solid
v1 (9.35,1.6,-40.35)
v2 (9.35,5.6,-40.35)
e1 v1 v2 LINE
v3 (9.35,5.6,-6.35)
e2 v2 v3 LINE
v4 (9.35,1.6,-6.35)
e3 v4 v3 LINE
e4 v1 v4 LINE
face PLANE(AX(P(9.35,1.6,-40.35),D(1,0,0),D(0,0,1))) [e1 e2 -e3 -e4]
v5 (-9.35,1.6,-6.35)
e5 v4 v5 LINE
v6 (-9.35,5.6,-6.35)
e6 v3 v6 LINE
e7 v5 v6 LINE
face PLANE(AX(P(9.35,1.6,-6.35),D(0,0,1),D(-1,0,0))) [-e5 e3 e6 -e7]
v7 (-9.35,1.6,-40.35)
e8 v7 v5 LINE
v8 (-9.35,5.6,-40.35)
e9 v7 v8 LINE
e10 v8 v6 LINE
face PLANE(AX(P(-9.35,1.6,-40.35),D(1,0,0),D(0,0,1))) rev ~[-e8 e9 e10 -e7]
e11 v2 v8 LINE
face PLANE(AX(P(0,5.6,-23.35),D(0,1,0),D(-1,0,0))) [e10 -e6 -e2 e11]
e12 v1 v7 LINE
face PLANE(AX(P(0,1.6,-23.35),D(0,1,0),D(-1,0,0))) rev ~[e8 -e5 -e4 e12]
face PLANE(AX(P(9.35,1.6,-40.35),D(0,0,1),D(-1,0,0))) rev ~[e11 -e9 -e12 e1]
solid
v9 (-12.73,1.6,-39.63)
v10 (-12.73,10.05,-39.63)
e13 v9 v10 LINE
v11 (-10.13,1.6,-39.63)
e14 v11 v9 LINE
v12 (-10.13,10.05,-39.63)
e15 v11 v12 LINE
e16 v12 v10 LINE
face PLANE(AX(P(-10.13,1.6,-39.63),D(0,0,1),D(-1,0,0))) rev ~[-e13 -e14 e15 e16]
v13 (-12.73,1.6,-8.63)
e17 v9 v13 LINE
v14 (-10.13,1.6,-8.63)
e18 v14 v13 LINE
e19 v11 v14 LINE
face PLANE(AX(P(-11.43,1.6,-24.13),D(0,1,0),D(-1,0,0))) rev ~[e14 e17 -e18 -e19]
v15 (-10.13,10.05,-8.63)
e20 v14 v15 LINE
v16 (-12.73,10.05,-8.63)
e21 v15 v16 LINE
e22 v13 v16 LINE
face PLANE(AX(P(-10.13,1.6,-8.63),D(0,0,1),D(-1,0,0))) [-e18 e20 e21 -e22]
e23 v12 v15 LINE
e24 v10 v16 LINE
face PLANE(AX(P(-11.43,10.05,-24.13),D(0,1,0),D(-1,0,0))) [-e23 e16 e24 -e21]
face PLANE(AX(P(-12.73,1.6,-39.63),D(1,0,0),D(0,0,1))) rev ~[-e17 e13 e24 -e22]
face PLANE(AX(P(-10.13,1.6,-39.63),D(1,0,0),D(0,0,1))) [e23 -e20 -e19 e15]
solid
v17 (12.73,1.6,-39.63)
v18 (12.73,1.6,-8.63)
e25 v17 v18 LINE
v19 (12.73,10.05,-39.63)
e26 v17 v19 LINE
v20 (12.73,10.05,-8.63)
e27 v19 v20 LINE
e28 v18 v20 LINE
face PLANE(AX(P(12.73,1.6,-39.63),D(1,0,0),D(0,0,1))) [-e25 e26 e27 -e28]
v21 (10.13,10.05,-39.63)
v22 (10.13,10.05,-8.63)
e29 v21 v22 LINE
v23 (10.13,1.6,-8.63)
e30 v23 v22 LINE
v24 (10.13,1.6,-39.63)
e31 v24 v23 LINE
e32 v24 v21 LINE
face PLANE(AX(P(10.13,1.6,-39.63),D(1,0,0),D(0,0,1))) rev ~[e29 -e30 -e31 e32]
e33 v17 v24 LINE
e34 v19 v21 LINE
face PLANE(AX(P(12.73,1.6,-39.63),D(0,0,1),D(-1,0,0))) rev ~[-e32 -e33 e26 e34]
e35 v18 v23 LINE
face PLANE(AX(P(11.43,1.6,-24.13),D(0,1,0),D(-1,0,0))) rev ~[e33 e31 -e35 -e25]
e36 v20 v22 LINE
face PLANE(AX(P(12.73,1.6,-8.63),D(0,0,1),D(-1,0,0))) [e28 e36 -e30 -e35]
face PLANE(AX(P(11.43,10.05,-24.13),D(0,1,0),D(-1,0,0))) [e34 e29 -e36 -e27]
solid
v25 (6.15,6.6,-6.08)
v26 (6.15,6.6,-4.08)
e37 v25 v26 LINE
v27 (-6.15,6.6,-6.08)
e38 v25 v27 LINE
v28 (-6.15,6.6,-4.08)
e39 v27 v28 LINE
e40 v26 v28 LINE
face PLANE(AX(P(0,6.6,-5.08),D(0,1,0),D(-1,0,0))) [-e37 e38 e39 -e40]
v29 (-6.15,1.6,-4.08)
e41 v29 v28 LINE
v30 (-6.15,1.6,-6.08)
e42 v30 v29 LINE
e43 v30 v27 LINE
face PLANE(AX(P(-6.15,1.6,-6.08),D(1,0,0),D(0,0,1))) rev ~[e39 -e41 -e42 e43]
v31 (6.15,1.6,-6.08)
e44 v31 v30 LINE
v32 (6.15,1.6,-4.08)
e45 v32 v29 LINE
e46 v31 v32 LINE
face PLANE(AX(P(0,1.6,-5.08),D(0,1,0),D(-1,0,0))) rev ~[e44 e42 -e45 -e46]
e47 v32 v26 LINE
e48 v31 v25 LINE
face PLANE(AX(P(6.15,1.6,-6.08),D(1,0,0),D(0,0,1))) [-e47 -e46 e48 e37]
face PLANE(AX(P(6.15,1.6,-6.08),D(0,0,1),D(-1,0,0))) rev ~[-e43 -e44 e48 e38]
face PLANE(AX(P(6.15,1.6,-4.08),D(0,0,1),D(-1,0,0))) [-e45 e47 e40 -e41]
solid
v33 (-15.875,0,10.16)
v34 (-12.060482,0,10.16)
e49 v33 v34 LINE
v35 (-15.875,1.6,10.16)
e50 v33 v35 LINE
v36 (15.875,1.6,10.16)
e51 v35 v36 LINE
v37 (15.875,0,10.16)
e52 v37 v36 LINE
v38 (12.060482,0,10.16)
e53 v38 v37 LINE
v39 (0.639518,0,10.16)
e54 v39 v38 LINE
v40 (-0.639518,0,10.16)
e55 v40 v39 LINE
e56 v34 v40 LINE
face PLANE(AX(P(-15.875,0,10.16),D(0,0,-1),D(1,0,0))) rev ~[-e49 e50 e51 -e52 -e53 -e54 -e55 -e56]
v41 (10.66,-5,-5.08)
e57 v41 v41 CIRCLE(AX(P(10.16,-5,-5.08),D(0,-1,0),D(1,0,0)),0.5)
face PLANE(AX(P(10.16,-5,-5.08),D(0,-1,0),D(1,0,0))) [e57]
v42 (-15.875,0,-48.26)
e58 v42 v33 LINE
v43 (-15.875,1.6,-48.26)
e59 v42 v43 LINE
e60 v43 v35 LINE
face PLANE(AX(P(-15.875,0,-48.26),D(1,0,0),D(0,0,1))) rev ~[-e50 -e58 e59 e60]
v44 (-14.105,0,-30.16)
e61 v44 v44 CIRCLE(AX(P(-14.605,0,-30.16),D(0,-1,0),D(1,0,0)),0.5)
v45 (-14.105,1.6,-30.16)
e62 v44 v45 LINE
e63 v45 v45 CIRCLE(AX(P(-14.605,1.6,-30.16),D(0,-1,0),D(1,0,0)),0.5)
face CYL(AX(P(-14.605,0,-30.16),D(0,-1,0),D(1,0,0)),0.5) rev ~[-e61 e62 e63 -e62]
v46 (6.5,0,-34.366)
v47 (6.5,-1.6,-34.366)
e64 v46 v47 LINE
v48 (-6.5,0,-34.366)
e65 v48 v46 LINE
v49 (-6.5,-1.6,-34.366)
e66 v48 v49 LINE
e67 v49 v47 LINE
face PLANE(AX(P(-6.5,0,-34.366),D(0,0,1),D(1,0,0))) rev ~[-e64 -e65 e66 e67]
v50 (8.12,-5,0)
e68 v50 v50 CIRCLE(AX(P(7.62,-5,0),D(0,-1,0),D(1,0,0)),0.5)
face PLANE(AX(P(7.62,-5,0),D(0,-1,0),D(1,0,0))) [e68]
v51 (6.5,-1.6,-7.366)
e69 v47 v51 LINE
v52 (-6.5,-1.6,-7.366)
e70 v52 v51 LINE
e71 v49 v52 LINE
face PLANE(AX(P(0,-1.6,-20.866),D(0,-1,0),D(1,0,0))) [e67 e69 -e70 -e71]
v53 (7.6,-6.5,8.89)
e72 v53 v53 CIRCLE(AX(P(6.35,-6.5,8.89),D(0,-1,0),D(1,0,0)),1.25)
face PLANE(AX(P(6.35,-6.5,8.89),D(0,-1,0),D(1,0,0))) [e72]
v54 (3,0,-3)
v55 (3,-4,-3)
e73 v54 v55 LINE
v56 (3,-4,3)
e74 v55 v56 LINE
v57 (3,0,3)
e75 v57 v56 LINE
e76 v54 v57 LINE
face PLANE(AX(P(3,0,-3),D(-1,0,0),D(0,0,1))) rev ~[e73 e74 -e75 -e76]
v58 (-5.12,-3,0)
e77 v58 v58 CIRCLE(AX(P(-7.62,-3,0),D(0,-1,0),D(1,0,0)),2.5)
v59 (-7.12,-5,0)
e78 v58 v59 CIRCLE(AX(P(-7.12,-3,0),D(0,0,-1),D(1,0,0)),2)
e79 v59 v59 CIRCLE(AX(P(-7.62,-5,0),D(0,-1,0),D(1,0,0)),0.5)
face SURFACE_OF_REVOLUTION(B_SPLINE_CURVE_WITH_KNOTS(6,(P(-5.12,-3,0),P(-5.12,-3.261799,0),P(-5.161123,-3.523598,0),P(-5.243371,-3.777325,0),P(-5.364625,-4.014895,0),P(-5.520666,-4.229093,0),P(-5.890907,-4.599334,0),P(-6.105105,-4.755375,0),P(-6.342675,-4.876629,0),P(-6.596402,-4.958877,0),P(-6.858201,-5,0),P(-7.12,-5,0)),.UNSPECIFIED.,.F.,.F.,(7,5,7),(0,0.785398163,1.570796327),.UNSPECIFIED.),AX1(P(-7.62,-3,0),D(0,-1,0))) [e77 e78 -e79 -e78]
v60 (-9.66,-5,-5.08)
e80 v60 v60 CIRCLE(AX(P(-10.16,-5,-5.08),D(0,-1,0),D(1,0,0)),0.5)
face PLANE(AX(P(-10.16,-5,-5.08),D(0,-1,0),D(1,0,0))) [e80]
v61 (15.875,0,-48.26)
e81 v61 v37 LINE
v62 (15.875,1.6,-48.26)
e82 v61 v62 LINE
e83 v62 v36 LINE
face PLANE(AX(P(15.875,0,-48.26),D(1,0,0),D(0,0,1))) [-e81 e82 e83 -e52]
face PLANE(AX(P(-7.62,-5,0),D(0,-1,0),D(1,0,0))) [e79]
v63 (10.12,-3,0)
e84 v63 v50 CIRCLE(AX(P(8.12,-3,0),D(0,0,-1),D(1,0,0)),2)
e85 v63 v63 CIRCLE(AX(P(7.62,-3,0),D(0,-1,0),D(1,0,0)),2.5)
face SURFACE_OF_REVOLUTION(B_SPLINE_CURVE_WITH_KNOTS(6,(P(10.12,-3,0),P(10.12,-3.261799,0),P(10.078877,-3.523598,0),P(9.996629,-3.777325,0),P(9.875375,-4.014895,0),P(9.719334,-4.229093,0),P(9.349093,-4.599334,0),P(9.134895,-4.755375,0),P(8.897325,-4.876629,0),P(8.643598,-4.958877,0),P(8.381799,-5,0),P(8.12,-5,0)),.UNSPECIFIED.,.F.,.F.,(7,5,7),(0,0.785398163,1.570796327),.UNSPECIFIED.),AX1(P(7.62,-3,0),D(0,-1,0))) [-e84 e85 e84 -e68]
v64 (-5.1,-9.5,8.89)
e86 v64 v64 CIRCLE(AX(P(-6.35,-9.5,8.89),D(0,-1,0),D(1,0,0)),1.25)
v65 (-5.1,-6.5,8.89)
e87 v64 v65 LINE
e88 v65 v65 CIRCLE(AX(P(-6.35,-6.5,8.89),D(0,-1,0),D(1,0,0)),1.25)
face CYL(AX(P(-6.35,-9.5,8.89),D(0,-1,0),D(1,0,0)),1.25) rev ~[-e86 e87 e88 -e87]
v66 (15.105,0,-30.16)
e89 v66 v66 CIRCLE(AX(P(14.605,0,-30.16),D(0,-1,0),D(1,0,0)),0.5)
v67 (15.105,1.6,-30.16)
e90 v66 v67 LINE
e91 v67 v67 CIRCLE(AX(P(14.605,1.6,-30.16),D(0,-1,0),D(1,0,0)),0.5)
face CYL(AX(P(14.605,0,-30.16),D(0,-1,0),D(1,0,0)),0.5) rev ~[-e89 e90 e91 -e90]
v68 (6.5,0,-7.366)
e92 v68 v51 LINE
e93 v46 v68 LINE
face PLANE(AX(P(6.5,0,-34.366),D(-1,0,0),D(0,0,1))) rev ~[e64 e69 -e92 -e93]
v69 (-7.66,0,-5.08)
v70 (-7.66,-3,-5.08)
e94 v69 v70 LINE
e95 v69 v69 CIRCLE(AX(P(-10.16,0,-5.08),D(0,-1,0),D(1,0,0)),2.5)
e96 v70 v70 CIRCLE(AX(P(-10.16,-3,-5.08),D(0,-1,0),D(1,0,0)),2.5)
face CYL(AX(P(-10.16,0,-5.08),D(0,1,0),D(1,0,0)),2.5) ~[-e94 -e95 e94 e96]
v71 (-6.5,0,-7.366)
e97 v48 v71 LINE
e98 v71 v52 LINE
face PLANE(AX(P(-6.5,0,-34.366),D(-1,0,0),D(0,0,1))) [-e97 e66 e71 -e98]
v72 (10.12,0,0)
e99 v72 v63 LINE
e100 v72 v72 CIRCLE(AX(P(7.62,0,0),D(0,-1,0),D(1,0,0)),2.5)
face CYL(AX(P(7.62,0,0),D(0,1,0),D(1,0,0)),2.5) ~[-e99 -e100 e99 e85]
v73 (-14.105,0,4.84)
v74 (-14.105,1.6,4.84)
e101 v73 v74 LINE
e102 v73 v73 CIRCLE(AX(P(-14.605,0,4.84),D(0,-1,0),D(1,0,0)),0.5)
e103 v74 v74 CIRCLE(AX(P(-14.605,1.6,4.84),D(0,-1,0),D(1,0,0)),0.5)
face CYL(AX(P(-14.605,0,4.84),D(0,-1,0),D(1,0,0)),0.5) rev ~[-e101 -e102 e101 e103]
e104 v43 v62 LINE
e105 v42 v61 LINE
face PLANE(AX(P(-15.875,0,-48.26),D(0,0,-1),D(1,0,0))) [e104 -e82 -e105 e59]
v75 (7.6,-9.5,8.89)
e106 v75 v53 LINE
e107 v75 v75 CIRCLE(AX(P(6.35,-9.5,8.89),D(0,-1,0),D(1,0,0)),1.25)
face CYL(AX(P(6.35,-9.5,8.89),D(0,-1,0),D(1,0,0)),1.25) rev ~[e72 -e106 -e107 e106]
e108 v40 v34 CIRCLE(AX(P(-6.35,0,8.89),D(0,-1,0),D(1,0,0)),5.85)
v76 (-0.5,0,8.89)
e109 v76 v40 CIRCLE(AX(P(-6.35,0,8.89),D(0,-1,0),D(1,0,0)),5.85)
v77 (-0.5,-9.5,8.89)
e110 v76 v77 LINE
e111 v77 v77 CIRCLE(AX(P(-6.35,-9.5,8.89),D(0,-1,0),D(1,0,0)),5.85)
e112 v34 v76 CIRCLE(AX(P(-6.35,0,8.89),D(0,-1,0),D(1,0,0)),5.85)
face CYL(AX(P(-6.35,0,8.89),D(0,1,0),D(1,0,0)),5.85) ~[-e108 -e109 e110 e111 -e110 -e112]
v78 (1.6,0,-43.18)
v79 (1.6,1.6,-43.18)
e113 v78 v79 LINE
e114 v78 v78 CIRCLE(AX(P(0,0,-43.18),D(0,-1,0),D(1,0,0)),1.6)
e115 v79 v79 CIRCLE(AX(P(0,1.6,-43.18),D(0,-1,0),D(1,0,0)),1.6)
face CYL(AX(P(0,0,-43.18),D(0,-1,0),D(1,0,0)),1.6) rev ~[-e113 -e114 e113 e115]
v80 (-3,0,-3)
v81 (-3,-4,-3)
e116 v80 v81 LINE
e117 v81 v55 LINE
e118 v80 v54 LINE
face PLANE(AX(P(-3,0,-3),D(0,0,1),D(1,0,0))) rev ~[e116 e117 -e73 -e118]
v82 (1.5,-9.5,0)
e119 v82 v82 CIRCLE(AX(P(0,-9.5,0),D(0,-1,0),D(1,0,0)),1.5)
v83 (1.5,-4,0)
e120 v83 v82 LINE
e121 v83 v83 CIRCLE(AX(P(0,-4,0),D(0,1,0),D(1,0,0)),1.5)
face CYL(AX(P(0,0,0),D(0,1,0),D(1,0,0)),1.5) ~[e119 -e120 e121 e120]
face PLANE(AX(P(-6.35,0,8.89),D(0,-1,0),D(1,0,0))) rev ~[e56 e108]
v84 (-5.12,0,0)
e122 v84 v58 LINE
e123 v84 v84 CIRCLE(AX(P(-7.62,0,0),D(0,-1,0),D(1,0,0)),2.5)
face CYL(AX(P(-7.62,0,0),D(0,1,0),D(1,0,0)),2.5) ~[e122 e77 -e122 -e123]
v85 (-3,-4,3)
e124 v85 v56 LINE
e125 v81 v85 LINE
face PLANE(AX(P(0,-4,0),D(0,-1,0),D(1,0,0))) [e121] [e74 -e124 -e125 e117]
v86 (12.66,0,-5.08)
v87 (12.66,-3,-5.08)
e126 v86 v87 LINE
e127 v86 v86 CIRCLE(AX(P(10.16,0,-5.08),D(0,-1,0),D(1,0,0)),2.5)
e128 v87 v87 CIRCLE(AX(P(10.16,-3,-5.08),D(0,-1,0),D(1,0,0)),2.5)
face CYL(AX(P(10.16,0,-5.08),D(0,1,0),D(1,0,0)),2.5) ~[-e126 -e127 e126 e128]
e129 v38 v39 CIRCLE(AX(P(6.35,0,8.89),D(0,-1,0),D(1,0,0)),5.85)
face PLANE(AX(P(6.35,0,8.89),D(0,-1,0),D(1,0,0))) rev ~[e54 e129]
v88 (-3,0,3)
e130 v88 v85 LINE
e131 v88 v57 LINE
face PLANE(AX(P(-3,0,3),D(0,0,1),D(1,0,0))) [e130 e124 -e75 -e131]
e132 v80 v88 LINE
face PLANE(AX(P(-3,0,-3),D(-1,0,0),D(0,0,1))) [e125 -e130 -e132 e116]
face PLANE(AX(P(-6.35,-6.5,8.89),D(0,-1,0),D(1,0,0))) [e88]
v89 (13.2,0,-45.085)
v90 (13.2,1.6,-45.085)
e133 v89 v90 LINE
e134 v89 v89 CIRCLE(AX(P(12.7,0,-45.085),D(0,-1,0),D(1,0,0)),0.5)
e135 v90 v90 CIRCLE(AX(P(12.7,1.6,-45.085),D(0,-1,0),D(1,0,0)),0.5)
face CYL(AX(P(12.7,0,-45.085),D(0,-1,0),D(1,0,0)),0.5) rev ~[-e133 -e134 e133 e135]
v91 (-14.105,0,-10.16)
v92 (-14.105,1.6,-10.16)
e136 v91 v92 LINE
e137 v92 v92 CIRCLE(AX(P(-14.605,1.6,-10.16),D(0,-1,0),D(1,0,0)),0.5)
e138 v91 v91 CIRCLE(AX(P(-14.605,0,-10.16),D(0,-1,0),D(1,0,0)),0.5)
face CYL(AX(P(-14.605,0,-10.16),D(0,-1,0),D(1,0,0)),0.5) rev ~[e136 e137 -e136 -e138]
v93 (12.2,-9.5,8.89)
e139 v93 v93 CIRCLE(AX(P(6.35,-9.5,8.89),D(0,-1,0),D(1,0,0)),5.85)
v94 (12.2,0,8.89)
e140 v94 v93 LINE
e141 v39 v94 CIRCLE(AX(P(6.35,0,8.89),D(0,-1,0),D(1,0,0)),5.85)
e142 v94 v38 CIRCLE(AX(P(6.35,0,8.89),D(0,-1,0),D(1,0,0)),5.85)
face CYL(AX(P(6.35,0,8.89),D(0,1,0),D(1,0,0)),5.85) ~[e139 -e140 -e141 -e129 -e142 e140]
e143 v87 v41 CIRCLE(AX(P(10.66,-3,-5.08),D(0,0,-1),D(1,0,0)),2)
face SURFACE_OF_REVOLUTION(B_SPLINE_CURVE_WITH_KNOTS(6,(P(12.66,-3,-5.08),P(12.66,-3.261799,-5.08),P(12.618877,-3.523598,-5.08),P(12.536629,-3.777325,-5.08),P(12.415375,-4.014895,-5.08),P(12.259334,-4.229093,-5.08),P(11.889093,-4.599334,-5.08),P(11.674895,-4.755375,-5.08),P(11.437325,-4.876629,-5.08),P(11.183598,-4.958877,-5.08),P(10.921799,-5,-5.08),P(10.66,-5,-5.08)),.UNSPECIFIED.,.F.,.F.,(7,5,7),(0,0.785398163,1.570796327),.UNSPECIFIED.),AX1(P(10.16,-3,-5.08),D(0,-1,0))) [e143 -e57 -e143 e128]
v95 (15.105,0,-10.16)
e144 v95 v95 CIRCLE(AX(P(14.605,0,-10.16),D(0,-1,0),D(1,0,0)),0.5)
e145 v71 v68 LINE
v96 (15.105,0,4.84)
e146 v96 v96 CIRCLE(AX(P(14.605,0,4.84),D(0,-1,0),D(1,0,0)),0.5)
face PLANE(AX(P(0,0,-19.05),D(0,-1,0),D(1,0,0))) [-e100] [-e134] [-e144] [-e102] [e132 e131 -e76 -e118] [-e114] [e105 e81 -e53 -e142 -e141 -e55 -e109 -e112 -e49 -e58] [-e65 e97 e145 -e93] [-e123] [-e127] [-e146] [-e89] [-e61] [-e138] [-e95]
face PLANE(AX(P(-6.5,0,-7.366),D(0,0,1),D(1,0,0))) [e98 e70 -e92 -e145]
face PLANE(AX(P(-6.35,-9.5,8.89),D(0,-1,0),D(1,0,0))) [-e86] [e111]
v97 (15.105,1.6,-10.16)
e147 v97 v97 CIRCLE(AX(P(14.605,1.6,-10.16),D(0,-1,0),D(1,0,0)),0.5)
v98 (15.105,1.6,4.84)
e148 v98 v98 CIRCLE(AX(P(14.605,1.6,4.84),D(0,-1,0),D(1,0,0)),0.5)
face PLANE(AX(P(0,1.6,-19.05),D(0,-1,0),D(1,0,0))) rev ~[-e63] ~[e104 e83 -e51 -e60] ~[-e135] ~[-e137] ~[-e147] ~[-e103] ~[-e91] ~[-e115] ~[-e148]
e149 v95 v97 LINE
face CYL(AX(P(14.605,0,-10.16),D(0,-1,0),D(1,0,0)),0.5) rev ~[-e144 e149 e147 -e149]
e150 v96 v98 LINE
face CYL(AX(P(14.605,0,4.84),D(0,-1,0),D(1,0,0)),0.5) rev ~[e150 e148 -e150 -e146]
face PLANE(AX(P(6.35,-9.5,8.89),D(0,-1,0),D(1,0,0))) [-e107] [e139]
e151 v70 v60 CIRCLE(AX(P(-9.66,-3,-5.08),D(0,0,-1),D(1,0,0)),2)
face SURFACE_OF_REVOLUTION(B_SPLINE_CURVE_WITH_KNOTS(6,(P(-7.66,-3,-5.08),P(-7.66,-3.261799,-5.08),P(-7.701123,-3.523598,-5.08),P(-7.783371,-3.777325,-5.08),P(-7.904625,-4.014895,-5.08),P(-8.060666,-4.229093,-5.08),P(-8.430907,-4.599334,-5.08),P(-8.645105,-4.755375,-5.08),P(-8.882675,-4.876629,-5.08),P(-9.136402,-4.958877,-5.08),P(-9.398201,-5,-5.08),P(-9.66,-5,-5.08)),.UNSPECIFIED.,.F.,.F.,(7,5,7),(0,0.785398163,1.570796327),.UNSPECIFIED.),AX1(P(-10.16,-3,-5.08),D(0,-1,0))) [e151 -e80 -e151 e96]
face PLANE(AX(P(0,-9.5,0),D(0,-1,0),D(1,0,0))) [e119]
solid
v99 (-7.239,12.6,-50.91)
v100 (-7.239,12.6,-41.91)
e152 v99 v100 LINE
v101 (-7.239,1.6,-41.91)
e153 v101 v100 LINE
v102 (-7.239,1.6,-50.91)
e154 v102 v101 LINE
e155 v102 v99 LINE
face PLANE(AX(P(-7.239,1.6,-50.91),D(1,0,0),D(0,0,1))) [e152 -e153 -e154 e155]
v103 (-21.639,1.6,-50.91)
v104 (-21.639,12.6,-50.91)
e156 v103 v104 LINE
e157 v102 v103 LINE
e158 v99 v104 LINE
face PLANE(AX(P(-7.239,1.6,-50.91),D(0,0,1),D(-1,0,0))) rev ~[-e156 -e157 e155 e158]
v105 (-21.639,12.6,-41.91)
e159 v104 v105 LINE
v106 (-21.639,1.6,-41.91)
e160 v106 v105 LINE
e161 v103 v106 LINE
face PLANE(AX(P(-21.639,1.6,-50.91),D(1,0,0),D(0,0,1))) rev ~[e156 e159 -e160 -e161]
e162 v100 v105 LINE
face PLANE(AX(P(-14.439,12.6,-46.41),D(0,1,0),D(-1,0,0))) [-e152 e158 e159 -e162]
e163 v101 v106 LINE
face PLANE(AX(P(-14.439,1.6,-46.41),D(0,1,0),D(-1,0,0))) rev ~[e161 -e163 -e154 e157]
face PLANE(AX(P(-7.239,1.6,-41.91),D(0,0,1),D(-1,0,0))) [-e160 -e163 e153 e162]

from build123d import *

# Parameters (mm, degrees)
F0_W      = 31.75
F0_H      = 58.42
F0_R      = 0.5
F0_R_2    = 1.6
F1_DEPTH  = 1.6
F2_W      = 6
F2_H      = 6
F3_DEPTH  = 4
F4_R      = 1.5
F5_DEPTH  = 9.5
F6_R      = 5.85
F7_DEPTH  = 9.5
F8_W      = 13
F8_H      = 27
F9_DEPTH  = 1.6
F10_W     = 18.7
F10_H     = 34
F11_DEPTH = 4
F12_W     = 2.6
F12_H     = 31
F13_DEPTH = 8.45
F14_W     = 14.4
F14_H     = 9
F15_DEPTH = 11
F16_W     = 12.3
F16_H     = 2
F17_DEPTH = 5
F18_R     = 2.5
F19_DEPTH = 5
F20_R     = 2
F21_R     = 1.25
F22_DEPTH = 3


with BuildPart() as f1:
    # F0 (on Front) → F1 (new body)
    with BuildSketch(Plane.XZ):
        with Locations((0, -19.05)):
            Rectangle(F0_W, F0_H)
        with Locations((-14.605, -30.16)):
            Circle(F0_R, mode=Mode.SUBTRACT)
        with Locations((0, -43.18)):
            Circle(F0_R_2, mode=Mode.SUBTRACT)
        with Locations((12.7, -45.085)):
            Circle(F0_R, mode=Mode.SUBTRACT)
        with Locations((14.605, -30.16)):
            Circle(F0_R, mode=Mode.SUBTRACT)
        with Locations((-14.605, -10.16)):
            Circle(F0_R, mode=Mode.SUBTRACT)
        with Locations((-14.605, 4.84)):
            Circle(F0_R, mode=Mode.SUBTRACT)
        with Locations((14.605, -10.16)):
            Circle(F0_R, mode=Mode.SUBTRACT)
        with Locations((14.605, 4.84)):
            Circle(F0_R, mode=Mode.SUBTRACT)
    extrude(amount=-F1_DEPTH)

    # F2 (on Front) → F3 (join)
    with BuildSketch(Plane.XZ):
        Rectangle(F2_W, F2_H)
    extrude(amount=F3_DEPTH)

    # F4 (on Front) → F5 (join)
    with BuildSketch(Plane.XZ):
        Circle(F4_R)
    extrude(amount=F5_DEPTH)

    # F6 (on Front) → F7 (join)
    with BuildSketch(Plane.XZ):
        with Locations((-6.35, 8.89)):
            Circle(F6_R)
        with Locations((6.35, 8.89)):
            Circle(F6_R)
    extrude(amount=F7_DEPTH)

    # F8 (on Front) → F9 (join)
    with BuildSketch(Plane.XZ):
        with Locations((0, -20.866)):
            Rectangle(F8_W, F8_H)
    extrude(amount=F9_DEPTH)

    # F18 (on Front) → F19 (join)
    with BuildSketch(Plane.XZ):
        with Locations((-7.62, 0)):
            Circle(F18_R)
        with Locations((7.62, 0)):
            Circle(F18_R)
        with Locations((10.16, -5.08)):
            Circle(F18_R)
        with Locations((-10.16, -5.08)):
            Circle(F18_R)
    extrude(amount=F19_DEPTH)

    # F20
    f20_edges = [f1.edges().sort_by_distance(p)[0] for p in [
        (-12.66, -5, -5.08),
        (-10.12, -5, 0),
        (5.12, -5, 0),
        (7.66, -5, -5.08),
    ]]
    fillet(f20_edges, radius=F20_R)

    # F21 (on face) → F22 (cut)
    with BuildSketch(Plane.XZ.offset(9.5)):
        with Locations((-6.35, 8.89)):
            Circle(F21_R)
        with Locations((6.35, 8.89)):
            Circle(F21_R)
    extrude(amount=-F22_DEPTH, mode=Mode.SUBTRACT)


with BuildPart() as f11:
    # F10 (on face) → F11 (new body)
    with BuildSketch(Plane(origin=(0, 1.6, 0), x_dir=(-1, 0, 0), z_dir=(0, 1, 0))):
        with Locations((0, -23.35)):
            Rectangle(F10_W, F10_H)
    extrude(amount=F11_DEPTH)


with BuildPart() as f13:
    # F12 (on face) → F13 (new body)
    with BuildSketch(Plane(origin=(0, 1.6, 0), x_dir=(-1, 0, 0), z_dir=(0, 1, 0))):
        with Locations((-11.43, -24.13)):
            Rectangle(F12_W, F12_H)
    extrude(amount=F13_DEPTH)


with BuildPart() as f13b:
    # F12 (on face) → F13, piece 2 (new body)
    with BuildSketch(Plane(origin=(0, 1.6, 0), x_dir=(-1, 0, 0), z_dir=(0, 1, 0))):
        with Locations((11.43, -24.13)):
            Rectangle(F12_W, F12_H)
    extrude(amount=F13_DEPTH)


with BuildPart() as f15:
    # F14 (on face) → F15 (new body)
    with BuildSketch(Plane(origin=(0, 1.6, 0), x_dir=(-1, 0, 0), z_dir=(0, 1, 0))):
        with Locations((14.439, -46.41)):
            Rectangle(F14_W, F14_H)
    extrude(amount=F15_DEPTH)


with BuildPart() as f17:
    # F16 (on face) → F17 (new body)
    with BuildSketch(Plane(origin=(0, 1.6, 0), x_dir=(-1, 0, 0), z_dir=(0, 1, 0))):
        with Locations((0, -5.08)):
            Rectangle(F16_W, F16_H)
    extrude(amount=F17_DEPTH)


solid = Compound([f1.part, f11.part, f13.part, f13b.part, f15.part, f17.part])
